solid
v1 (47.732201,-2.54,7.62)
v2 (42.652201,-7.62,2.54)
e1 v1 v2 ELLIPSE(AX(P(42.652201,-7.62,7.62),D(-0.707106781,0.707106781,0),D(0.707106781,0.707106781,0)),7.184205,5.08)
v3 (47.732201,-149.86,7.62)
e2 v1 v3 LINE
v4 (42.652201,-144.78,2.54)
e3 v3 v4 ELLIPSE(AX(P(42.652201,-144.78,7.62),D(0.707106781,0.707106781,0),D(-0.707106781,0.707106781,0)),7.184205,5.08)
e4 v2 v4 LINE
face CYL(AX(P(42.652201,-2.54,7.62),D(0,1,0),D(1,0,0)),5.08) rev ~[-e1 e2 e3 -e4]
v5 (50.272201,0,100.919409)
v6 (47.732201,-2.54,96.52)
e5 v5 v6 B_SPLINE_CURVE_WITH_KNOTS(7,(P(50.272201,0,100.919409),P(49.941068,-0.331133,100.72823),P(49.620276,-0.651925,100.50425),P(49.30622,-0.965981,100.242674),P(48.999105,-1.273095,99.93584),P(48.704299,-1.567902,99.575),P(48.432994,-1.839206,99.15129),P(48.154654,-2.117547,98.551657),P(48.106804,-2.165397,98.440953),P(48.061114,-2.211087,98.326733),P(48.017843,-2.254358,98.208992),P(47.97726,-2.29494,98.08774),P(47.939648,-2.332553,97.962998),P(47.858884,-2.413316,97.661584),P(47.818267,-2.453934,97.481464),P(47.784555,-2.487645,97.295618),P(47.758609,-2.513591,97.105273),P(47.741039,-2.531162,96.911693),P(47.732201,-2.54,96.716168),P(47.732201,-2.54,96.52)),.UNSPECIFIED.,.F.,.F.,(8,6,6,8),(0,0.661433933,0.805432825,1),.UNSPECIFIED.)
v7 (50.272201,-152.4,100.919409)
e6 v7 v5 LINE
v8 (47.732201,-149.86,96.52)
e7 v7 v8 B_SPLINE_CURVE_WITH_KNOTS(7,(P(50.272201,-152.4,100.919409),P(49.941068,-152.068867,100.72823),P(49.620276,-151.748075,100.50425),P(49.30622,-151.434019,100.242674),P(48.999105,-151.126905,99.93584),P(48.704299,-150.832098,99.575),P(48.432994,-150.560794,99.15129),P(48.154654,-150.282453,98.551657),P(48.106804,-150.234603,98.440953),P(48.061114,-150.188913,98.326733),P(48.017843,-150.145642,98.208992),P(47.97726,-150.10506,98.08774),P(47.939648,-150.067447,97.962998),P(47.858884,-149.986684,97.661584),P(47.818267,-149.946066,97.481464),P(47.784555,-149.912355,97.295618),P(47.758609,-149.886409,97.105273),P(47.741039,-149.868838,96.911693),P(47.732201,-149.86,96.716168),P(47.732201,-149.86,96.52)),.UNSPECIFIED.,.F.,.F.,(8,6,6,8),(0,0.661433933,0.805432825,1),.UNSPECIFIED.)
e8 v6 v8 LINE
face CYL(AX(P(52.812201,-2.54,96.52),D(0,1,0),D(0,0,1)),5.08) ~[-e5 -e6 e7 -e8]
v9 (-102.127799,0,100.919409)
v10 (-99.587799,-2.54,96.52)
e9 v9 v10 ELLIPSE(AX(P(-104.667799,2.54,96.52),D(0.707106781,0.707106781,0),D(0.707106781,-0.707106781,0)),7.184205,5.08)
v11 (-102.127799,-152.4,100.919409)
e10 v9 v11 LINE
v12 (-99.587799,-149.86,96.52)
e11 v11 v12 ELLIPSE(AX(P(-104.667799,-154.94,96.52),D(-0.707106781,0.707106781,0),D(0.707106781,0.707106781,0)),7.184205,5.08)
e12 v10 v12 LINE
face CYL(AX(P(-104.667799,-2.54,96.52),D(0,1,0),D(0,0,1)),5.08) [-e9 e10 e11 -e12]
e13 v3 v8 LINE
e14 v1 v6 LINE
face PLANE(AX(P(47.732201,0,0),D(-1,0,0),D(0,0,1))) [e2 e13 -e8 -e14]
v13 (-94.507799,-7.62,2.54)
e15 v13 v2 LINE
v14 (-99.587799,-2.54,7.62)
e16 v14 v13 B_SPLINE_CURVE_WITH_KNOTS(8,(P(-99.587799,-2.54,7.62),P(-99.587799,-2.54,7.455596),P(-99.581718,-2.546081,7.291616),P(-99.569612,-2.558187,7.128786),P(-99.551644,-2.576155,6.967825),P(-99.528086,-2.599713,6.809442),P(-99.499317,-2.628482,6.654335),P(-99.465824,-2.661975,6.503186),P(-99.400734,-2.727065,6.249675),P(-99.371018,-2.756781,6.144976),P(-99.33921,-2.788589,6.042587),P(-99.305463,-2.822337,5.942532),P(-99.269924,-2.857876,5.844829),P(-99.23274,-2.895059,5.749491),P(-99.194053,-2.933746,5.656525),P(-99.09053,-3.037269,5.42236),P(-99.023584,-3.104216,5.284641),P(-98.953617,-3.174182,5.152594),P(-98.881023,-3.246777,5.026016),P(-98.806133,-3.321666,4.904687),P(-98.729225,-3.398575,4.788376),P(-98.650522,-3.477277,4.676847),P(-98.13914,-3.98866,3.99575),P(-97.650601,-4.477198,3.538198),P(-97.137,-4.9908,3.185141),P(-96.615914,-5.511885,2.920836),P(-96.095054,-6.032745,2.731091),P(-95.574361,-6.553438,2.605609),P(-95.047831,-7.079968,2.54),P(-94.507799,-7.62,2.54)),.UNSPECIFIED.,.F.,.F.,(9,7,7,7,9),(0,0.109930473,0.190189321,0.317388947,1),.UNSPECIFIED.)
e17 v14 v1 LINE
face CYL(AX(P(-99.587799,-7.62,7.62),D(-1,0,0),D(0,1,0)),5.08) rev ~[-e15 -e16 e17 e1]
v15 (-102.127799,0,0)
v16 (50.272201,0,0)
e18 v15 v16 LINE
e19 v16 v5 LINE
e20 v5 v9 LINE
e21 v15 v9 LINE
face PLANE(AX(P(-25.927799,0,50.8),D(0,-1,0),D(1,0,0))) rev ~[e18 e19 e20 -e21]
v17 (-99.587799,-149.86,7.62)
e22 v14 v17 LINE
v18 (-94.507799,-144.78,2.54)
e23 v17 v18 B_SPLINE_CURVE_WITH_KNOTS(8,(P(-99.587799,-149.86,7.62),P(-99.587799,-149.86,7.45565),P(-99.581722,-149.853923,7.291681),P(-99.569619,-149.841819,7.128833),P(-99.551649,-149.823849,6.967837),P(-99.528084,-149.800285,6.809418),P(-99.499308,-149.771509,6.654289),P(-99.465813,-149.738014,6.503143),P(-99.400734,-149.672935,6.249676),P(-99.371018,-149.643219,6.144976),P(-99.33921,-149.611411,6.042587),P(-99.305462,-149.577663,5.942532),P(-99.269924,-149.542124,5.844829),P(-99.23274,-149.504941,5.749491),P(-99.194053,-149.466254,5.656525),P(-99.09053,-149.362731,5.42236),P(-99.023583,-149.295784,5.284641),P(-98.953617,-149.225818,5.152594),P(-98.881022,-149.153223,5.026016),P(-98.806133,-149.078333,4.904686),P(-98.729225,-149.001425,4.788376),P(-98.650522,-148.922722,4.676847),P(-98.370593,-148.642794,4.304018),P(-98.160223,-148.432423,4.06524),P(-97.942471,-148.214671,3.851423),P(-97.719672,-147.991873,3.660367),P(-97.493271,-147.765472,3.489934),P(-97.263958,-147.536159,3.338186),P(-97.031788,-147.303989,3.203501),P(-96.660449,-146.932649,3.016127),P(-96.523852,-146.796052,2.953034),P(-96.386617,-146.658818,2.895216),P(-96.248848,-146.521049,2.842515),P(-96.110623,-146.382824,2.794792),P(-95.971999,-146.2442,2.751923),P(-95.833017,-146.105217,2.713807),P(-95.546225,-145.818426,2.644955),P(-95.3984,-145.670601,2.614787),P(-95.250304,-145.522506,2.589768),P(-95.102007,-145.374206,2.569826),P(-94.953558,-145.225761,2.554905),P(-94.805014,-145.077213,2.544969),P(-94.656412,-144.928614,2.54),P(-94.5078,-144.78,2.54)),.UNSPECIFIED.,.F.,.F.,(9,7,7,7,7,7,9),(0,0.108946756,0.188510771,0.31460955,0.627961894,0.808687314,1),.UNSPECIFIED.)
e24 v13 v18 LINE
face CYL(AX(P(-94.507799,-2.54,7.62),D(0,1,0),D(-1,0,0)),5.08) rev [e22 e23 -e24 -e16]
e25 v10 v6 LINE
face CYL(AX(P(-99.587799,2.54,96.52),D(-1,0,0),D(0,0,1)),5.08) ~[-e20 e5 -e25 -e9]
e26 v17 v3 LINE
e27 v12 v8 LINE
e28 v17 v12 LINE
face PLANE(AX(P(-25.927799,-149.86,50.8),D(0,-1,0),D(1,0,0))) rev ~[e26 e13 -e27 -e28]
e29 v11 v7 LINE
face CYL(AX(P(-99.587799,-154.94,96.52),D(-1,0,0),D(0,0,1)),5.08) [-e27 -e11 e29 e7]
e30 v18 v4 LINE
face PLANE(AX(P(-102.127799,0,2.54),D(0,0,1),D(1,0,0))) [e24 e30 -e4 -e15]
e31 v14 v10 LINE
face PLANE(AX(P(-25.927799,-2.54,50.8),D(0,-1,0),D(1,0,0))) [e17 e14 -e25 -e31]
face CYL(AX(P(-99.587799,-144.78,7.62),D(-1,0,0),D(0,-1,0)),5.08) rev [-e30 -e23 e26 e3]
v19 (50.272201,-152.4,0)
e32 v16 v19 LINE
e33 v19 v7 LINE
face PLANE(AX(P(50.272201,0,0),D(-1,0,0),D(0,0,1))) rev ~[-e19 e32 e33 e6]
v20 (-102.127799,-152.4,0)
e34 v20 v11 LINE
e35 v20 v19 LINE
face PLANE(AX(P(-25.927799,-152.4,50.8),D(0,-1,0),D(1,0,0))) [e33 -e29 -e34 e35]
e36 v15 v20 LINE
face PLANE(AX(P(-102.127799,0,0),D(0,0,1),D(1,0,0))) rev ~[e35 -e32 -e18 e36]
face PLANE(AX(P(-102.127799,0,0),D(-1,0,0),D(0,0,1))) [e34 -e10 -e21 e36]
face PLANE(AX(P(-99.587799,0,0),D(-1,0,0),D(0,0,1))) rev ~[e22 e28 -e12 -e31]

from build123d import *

# Parameters (mm, degrees)
F0_W         = 152.4
F0_H         = 101.6
F1_DEPTH     = 152.4
F2_T         = -2.54
F3_T1_DEPTH  = 147.32
F3_T3_DEPTH  = 147.32
F3_T5_DEPTH  = 147.32
F3_T7_DEPTH  = 147.32
F3_T13_DEPTH = 160.02
F3_T19_DEPTH = 160.02
F3_T28_DEPTH = 160.02
F3_T34_DEPTH = 160.02
F3_T43_DEPTH = 160.02
F3_T49_DEPTH = 160.02
F3_T58_DEPTH = 160.02
F3_T64_DEPTH = 160.02


# Not quite as in the source:
# - a fillet or chamfer that OpenCascade refuses, or shapes differently, is made with other operations: its cross-section is extruded or revolved along the edge and cut away or added


with BuildPart() as f1:
    # F0 (on Front) → F1 (new body)
    with BuildSketch(Plane.XZ):
        with Locations((-25.9277992306, 50.8)):
            Rectangle(F0_W, F0_H)
    extrude(amount=F1_DEPTH)

    # F2
    f2_openings = [f1.faces().sort_by_distance(p)[0] for p in [
        (-25.927799, -76.2, 101.6),
    ]]
    offset(amount=F2_T, openings=f2_openings)

    # F3: fillet of radius 5.08 on 8 edges, made by hand

    # F3_s2 → F3_t1 (join)
    with BuildSketch(Plane.XZ.offset(2.54)):
        with BuildLine():
            ThreePointArc((47.7322007694, 7.62), (46.2443032178, 4.0278975516), (42.6522007694, 2.54))
            Line((42.6522007694, 2.54), (47.7322007694, 2.54))
            Line((47.7322007694, 2.54), (47.7322007694, 7.62))
        make_face()
        with BuildLine():
            ThreePointArc((-99.5877992306, 7.62), (-98.0999016791, 4.0278975516), (-94.5077992306, 2.54))
            Line((-94.5077992306, 2.54), (-99.5877992306, 2.54))
            Line((-99.5877992306, 2.54), (-99.5877992306, 7.62))
        make_face()
    extrude(amount=F3_T1_DEPTH)

    # F3_s4 → F3_t3 (join)
    with BuildSketch(Plane.YZ.offset(-99.5877992306)):
        with BuildLine():
            ThreePointArc((-2.54, 7.62), (-4.0278975516, 4.0278975516), (-7.62, 2.54))
            Line((-7.62, 2.54), (-2.54, 2.54))
            Line((-2.54, 2.54), (-2.54, 7.62))
        make_face()
        with BuildLine():
            ThreePointArc((-149.86, 7.62), (-148.3721024484, 4.0278975516), (-144.78, 2.54))
            Line((-144.78, 2.54), (-149.86, 2.54))
            Line((-149.86, 2.54), (-149.86, 7.62))
        make_face()
    extrude(amount=F3_T3_DEPTH)

    # F3_s6 → F3_t5 (cut)
    with BuildSketch(Plane.YZ.offset(-99.5877992306)):
        with BuildLine():
            ThreePointArc((2.54, 101.6), (-1.0521024484, 100.1121024484), (-2.54, 96.52))
            Line((-2.54, 96.52), (-2.54, 101.6))
            Line((-2.54, 101.6), (2.54, 101.6))
        make_face()
        with BuildLine():
            ThreePointArc((-154.94, 101.6), (-151.3478975516, 100.1121024484), (-149.86, 96.52))
            Line((-149.86, 96.52), (-149.86, 101.6))
            Line((-149.86, 101.6), (-154.94, 101.6))
        make_face()
    extrude(amount=F3_T5_DEPTH, mode=Mode.SUBTRACT)

    # F3_s8 → F3_t7 (cut)
    with BuildSketch(Plane.XZ.offset(2.54)):
        with BuildLine():
            ThreePointArc((52.8122007694, 101.6), (49.2200983209, 100.1121024484), (47.7322007694, 96.52))
            Line((47.7322007694, 96.52), (47.7322007694, 101.6))
            Line((47.7322007694, 101.6), (52.8122007694, 101.6))
        make_face()
        with BuildLine():
            ThreePointArc((-104.6677992306, 101.6), (-101.0756967822, 100.1121024484), (-99.5877992306, 96.52))
            Line((-99.5877992306, 96.52), (-99.5877992306, 101.6))
            Line((-99.5877992306, 101.6), (-104.6677992306, 101.6))
        make_face()
    extrude(amount=F3_T7_DEPTH, mode=Mode.SUBTRACT)


with BuildPart() as f3_tool11:
    # F3_s12 → F3_t13 (new body)
    with BuildSketch(Plane.XZ.offset(-10.16)):
        with BuildLine():
            ThreePointArc((52.8122007694, 101.6), (49.2200983209, 100.1121024484), (47.7322007694, 96.52))
            Line((47.7322007694, 96.52), (47.7322007694, 101.6))
            Line((47.7322007694, 101.6), (52.8122007694, 101.6))
        make_face()
    extrude(amount=F3_T13_DEPTH)

    split(bisect_by=Plane.XZ, keep=Keep.TOP)

    split(bisect_by=Plane.YZ.offset(50.2722007694), keep=Keep.BOTTOM)

    split(bisect_by=Plane.XZ.offset(2.54), keep=Keep.BOTTOM)


with BuildPart() as f3_tool17:
    # F3_s18 → F3_t19 (new body)
    with BuildSketch(Plane.YZ.offset(60.4322007694)):
        with BuildLine():
            ThreePointArc((2.54, 101.6), (-1.0521024484, 100.1121024484), (-2.54, 96.52))
            Line((-2.54, 96.52), (-2.54, 101.6))
            Line((-2.54, 101.6), (2.54, 101.6))
        make_face()
    extrude(amount=-F3_T19_DEPTH)

    split(bisect_by=Plane.XZ, keep=Keep.TOP)

    split(bisect_by=Plane.YZ.offset(50.2722007694), keep=Keep.BOTTOM)

    split(bisect_by=Plane.YZ.offset(47.7322007694), keep=Keep.TOP)


with BuildPart() as f3_tool11_1:
    add(f3_tool11.part)

    # F3_t23: intersect F3_tool17
    add(f3_tool17.part, mode=Mode.INTERSECT)


with BuildPart() as f1_1:
    add(f1.part)

    # F3_t9: cut F3_tool11
    add(f3_tool11_1.part, mode=Mode.SUBTRACT)


with BuildPart() as f3_tool26:
    # F3_s27 → F3_t28 (new body)
    with BuildSketch(Plane.YZ.offset(47.7322007694)):
        with BuildLine():
            ThreePointArc((2.54, 101.6), (-1.0521024484, 100.1121024484), (-2.54, 96.52))
            Line((-2.54, 96.52), (-2.54, 101.6))
            Line((-2.54, 101.6), (2.54, 101.6))
        make_face()
    extrude(amount=-F3_T28_DEPTH)

    split(bisect_by=Plane.YZ.offset(-102.1277992306), keep=Keep.TOP)

    split(bisect_by=Plane.XZ, keep=Keep.TOP)

    split(bisect_by=Plane.YZ.offset(-99.5877992306), keep=Keep.BOTTOM)


with BuildPart() as f3_tool32:
    # F3_s33 → F3_t34 (new body)
    with BuildSketch(Plane.XZ.offset(-10.16)):
        with BuildLine():
            ThreePointArc((-104.6677992306, 101.6), (-101.0756967822, 100.1121024484), (-99.5877992306, 96.52))
            Line((-99.5877992306, 96.52), (-99.5877992306, 101.6))
            Line((-99.5877992306, 101.6), (-104.6677992306, 101.6))
        make_face()
    extrude(amount=F3_T34_DEPTH)

    split(bisect_by=Plane.YZ.offset(-102.1277992306), keep=Keep.TOP)

    split(bisect_by=Plane.XZ, keep=Keep.TOP)

    split(bisect_by=Plane.XZ.offset(2.54), keep=Keep.BOTTOM)


with BuildPart() as f3_tool26_1:
    add(f3_tool26.part)

    # F3_t38: intersect F3_tool32
    add(f3_tool32.part, mode=Mode.INTERSECT)


with BuildPart() as f1_2:
    add(f1_1.part)

    # F3_t24: cut F3_tool26
    add(f3_tool26_1.part, mode=Mode.SUBTRACT)


with BuildPart() as f3_tool41:
    # F3_s42 → F3_t43 (new body)
    with BuildSketch(Plane.XZ.offset(2.54)):
        with BuildLine():
            ThreePointArc((52.8122007694, 101.6), (49.2200983209, 100.1121024484), (47.7322007694, 96.52))
            Line((47.7322007694, 96.52), (47.7322007694, 101.6))
            Line((47.7322007694, 101.6), (52.8122007694, 101.6))
        make_face()
    extrude(amount=F3_T43_DEPTH)

    split(bisect_by=Plane.XZ.offset(152.4), keep=Keep.BOTTOM)

    split(bisect_by=Plane.YZ.offset(50.2722007694), keep=Keep.BOTTOM)

    split(bisect_by=Plane.XZ.offset(149.86), keep=Keep.TOP)


with BuildPart() as f3_tool47:
    # F3_s48 → F3_t49 (new body)
    with BuildSketch(Plane.YZ.offset(60.4322007694)):
        with BuildLine():
            ThreePointArc((-154.94, 101.6), (-151.3478975516, 100.1121024484), (-149.86, 96.52))
            Line((-149.86, 96.52), (-149.86, 101.6))
            Line((-149.86, 101.6), (-154.94, 101.6))
        make_face()
    extrude(amount=-F3_T49_DEPTH)

    split(bisect_by=Plane.XZ.offset(152.4), keep=Keep.BOTTOM)

    split(bisect_by=Plane.YZ.offset(50.2722007694), keep=Keep.BOTTOM)

    split(bisect_by=Plane.YZ.offset(47.7322007694), keep=Keep.TOP)


with BuildPart() as f3_tool41_1:
    add(f3_tool41.part)

    # F3_t53: intersect F3_tool47
    add(f3_tool47.part, mode=Mode.INTERSECT)


with BuildPart() as f1_3:
    add(f1_2.part)

    # F3_t39: cut F3_tool41
    add(f3_tool41_1.part, mode=Mode.SUBTRACT)


with BuildPart() as f3_tool56:
    # F3_s57 → F3_t58 (new body)
    with BuildSketch(Plane.XZ.offset(2.54)):
        with BuildLine():
            ThreePointArc((-104.6677992306, 101.6), (-101.0756967822, 100.1121024484), (-99.5877992306, 96.52))
            Line((-99.5877992306, 96.52), (-99.5877992306, 101.6))
            Line((-99.5877992306, 101.6), (-104.6677992306, 101.6))
        make_face()
    extrude(amount=F3_T58_DEPTH)

    split(bisect_by=Plane.YZ.offset(-102.1277992306), keep=Keep.TOP)

    split(bisect_by=Plane.XZ.offset(152.4), keep=Keep.BOTTOM)

    split(bisect_by=Plane.XZ.offset(149.86), keep=Keep.TOP)


with BuildPart() as f3_tool62:
    # F3_s63 → F3_t64 (new body)
    with BuildSketch(Plane.YZ.offset(47.7322007694)):
        with BuildLine():
            ThreePointArc((-154.94, 101.6), (-151.3478975516, 100.1121024484), (-149.86, 96.52))
            Line((-149.86, 96.52), (-149.86, 101.6))
            Line((-149.86, 101.6), (-154.94, 101.6))
        make_face()
    extrude(amount=-F3_T64_DEPTH)

    split(bisect_by=Plane.YZ.offset(-102.1277992306), keep=Keep.TOP)

    split(bisect_by=Plane.XZ.offset(152.4), keep=Keep.BOTTOM)

    split(bisect_by=Plane.YZ.offset(-99.5877992306), keep=Keep.BOTTOM)


with BuildPart() as f3_tool56_1:
    add(f3_tool56.part)

    # F3_t68: intersect F3_tool62
    add(f3_tool62.part, mode=Mode.INTERSECT)


with BuildPart() as f1_4:
    add(f1_3.part)

    # F3_t54: cut F3_tool56
    add(f3_tool56_1.part, mode=Mode.SUBTRACT)


solid = f1_4.part
